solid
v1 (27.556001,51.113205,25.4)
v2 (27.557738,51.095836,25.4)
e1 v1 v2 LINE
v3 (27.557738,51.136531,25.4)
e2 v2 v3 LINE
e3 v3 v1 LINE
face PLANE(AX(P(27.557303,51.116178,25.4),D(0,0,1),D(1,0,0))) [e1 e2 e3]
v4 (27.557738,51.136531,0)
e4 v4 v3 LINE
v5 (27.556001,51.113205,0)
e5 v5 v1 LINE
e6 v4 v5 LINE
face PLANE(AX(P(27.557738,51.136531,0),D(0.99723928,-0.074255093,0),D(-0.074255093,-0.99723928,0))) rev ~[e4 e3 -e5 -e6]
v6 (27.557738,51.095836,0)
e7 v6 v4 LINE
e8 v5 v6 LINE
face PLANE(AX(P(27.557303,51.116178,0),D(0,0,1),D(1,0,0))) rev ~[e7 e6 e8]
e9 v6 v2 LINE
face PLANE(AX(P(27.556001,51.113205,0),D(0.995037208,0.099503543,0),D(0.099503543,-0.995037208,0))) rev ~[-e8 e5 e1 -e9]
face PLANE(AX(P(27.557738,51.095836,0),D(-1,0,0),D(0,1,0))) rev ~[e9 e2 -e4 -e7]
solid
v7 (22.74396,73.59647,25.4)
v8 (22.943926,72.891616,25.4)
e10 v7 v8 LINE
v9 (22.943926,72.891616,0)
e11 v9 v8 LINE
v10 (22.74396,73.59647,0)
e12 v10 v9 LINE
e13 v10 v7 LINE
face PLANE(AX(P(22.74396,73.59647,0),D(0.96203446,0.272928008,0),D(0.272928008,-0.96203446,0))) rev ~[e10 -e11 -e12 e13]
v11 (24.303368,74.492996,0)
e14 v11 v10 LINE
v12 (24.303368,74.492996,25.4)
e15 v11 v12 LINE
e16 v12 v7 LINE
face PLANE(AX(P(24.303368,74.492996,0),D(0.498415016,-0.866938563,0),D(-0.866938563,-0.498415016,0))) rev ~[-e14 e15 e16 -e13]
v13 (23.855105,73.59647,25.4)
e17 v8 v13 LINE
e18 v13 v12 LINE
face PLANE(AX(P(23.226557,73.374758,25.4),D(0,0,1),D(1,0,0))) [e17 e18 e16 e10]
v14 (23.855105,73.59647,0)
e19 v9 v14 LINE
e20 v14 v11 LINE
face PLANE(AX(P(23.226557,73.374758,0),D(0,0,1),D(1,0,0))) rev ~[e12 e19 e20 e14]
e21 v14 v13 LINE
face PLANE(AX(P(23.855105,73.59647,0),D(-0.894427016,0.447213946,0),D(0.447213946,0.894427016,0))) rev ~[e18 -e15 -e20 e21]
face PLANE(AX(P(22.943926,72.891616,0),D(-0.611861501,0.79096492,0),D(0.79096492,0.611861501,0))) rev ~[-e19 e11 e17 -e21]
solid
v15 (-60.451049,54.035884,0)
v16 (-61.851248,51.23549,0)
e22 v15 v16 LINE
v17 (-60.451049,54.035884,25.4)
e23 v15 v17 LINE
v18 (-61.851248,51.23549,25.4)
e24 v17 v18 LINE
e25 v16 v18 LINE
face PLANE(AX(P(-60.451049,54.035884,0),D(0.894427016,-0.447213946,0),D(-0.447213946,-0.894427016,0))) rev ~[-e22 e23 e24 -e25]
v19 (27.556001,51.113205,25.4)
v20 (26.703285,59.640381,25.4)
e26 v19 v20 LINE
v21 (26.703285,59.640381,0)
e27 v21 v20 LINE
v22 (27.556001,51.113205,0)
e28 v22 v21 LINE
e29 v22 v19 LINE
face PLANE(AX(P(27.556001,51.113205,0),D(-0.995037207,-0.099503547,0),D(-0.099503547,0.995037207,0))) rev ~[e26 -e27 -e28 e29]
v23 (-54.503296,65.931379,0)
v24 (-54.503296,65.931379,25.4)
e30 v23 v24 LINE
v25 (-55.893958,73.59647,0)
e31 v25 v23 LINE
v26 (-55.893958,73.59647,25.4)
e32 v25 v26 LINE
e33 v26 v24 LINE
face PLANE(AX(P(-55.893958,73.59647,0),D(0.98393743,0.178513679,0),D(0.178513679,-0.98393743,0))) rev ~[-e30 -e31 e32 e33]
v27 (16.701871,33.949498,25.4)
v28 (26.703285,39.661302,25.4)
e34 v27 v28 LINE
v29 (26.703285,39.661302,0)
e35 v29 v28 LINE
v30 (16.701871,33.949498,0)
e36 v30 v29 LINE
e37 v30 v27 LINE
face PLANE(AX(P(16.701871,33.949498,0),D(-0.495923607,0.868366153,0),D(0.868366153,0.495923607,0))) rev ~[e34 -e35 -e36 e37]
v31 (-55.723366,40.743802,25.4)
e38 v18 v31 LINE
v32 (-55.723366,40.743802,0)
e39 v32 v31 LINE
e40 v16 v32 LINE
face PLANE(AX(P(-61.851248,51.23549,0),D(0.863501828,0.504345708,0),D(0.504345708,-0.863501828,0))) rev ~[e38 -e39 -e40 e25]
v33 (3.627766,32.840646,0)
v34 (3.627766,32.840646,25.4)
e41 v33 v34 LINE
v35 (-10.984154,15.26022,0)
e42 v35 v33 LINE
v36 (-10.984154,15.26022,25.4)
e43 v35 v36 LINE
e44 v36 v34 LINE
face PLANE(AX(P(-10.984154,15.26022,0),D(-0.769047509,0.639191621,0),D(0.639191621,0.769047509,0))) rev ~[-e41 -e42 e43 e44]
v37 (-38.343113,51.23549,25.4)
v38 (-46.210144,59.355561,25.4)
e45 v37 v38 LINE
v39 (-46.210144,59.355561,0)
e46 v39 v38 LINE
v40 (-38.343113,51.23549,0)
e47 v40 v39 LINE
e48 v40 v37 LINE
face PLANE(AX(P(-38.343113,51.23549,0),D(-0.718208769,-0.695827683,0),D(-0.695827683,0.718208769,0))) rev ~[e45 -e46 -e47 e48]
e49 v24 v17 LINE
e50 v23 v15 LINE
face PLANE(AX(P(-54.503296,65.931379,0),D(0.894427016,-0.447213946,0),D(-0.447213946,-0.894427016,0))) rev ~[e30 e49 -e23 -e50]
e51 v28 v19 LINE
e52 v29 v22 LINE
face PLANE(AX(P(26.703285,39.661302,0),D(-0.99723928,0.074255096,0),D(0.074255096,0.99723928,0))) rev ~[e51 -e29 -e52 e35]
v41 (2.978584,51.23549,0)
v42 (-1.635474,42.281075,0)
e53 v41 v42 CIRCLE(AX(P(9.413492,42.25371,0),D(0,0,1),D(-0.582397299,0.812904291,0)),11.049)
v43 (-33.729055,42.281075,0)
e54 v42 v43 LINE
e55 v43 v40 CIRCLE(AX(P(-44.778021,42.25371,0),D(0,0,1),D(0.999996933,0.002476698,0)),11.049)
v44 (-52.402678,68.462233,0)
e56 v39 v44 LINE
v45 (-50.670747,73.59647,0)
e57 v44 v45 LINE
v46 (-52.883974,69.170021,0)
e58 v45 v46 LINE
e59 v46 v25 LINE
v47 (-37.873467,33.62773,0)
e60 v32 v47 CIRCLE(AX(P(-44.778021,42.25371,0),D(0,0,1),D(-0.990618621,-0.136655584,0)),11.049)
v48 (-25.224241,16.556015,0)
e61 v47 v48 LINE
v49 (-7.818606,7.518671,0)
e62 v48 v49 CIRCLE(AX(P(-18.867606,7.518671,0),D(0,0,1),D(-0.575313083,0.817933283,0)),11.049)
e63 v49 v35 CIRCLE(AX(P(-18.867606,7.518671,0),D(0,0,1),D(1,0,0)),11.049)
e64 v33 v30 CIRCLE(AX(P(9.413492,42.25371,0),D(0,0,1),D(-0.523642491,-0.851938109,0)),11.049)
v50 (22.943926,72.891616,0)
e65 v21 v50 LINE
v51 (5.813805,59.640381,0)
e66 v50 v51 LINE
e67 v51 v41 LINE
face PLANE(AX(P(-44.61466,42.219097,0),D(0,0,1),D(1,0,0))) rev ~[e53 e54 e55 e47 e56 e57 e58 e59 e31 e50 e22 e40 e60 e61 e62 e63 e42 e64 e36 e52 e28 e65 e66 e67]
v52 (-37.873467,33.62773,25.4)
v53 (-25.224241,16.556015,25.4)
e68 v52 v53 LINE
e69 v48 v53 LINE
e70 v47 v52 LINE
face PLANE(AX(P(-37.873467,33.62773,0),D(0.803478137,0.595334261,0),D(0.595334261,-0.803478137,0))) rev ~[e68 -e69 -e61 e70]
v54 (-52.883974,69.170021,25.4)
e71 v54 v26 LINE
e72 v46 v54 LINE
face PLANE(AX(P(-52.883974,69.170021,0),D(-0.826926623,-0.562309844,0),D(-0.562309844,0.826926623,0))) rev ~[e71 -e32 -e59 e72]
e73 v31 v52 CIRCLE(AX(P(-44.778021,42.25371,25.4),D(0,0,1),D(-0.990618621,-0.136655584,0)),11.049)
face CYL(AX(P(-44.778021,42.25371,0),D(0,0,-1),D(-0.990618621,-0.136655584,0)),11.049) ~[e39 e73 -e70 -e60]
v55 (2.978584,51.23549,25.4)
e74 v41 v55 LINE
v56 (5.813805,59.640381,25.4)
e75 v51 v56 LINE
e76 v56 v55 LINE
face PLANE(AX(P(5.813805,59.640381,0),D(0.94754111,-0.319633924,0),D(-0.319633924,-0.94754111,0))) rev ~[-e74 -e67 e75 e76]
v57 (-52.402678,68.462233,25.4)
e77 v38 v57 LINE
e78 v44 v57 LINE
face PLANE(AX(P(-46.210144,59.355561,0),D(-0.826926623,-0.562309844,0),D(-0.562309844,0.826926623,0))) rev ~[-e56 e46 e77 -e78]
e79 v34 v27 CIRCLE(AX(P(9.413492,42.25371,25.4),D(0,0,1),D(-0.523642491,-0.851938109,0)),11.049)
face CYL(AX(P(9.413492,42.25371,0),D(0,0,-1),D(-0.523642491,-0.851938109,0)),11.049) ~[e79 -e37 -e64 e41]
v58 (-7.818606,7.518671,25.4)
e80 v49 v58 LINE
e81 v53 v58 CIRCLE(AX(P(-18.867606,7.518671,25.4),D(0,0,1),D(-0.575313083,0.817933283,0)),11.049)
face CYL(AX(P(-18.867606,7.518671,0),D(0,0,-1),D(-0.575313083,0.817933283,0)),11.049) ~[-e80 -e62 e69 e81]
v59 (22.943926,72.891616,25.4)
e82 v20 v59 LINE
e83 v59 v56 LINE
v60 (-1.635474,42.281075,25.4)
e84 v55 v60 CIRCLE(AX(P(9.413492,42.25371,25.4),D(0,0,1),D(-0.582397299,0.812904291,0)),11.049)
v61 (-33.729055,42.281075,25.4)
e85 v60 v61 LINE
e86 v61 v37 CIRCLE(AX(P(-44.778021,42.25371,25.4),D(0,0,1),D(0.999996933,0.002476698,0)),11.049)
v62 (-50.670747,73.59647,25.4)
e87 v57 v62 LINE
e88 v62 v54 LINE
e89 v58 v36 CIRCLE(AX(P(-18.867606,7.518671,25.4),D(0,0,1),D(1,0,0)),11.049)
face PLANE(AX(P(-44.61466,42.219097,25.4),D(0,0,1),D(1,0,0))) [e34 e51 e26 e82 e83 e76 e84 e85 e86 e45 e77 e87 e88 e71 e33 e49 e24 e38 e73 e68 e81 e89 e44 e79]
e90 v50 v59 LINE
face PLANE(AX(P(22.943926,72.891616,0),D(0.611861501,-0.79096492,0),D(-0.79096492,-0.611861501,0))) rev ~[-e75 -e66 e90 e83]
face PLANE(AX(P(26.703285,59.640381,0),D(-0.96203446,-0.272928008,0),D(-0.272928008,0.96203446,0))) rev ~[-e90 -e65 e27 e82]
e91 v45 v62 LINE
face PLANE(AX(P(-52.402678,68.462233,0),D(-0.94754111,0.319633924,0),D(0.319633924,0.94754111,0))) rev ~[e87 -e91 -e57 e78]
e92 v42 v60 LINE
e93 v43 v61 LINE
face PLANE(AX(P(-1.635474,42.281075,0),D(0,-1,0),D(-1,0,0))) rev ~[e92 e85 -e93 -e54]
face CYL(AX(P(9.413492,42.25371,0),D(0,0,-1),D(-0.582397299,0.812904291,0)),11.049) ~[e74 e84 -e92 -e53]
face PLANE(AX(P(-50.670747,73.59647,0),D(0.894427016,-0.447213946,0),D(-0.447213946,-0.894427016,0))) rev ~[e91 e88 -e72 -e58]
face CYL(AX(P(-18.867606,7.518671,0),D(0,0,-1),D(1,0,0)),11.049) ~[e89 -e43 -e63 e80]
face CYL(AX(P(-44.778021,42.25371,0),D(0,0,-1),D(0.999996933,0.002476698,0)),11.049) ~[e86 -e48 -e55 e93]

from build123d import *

# Parameters (mm, degrees)
F1_DEPTH = 25.4


with BuildPart() as f1:
    # F0 (on Top) → F1 (new body)
    with BuildSketch(Plane.XY):
        with BuildLine():
            ThreePointArc((-37.8734666786, 33.6277300409), (-34.8188839288, 37.4687345669), (-33.7290209754, 42.2537100409))
            ThreePointArc((-33.7290209754, 42.2537100409), (-33.7290294473, 42.2673925671), (-33.7290548629, 42.2810750723))
            ThreePointArc((-33.7290548629, 42.2810750723), (-34.9562672594, 47.3146936352), (-38.3431132138, 51.2354895473))
            ThreePointArc((-38.3431132138, 51.2354895473), (-50.4880897696, 51.7128598635), (-55.723366114, 40.743802495))
            ThreePointArc((-55.723366114, 40.743802495), (-48.8696733861, 31.9902417407), (-37.8734666786, 33.6277300409))
        make_face()
        with BuildLine():
            ThreePointArc((-33.7290548629, 42.2810750723), (-33.7290294473, 42.2673925671), (-33.7290209754, 42.2537100409))
            ThreePointArc((-33.7290209754, 42.2537100409), (-34.8188839288, 37.4687345669), (-37.8734666786, 33.6277300409))
            Line((-37.8734666786, 33.6277300409), (-25.2242405565, 16.5560153692))
            ThreePointArc((-25.2242405565, 16.5560153692), (-17.8663248029, 18.5222079697), (-10.9841542957, 15.2602198201))
            Line((-10.9841542957, 15.2602198201), (3.627766169, 32.8406458768))
            ThreePointArc((3.627766169, 32.8406458768), (-0.2370073884, 36.8733511802), (-1.6354740563, 42.2810750723))
            Line((-1.6354740563, 42.2810750723), (-33.7290548629, 42.2810750723))
        make_face()
        with BuildLine():
            ThreePointArc((-55.723366114, 40.743802495), (-50.4880897696, 51.7128598635), (-38.3431132138, 51.2354895473))
            Line((-38.3431132138, 51.2354895473), (-46.2101437151, 59.3555606902))
            Line((-46.2101437151, 59.3555606902), (-52.4026783197, 68.4622334303))
            Line((-52.4026783197, 68.4622334303), (-54.0672166674, 63.5277806198))
            Line((-54.0672166674, 63.5277806198), (-54.503296363, 65.9313786952))
            Line((-54.503296363, 65.9313786952), (-60.4510493577, 54.0358843751))
            Line((-60.4510493577, 54.0358843751), (-61.8512481451, 51.2354895473))
            Line((-61.8512481451, 51.2354895473), (-55.723366114, 40.743802495))
        make_face()
        with BuildLine():
            ThreePointArc((2.9785842946, 51.2354895473), (-0.4082616598, 47.3146936352), (-1.6354740563, 42.2810750723))
            ThreePointArc((-1.6354740563, 42.2810750723), (-0.2370073884, 36.8733511802), (3.627766169, 32.8406458768))
            ThreePointArc((3.627766169, 32.8406458768), (10.3472373536, 31.2442359064), (16.7018712654, 33.9494984888))
            ThreePointArc((16.7018712654, 33.9494984888), (19.4785231759, 37.6956896857), (20.4624920562, 42.2537100409))
            ThreePointArc((20.4624920562, 42.2537100409), (14.4623090039, 52.0817234938), (2.9785842946, 51.2354895473))
        make_face()
        with BuildLine():
            ThreePointArc((-10.9841542957, 15.2602198201), (-17.8663248029, 18.5222079697), (-25.2242405565, 16.5560153692))
            ThreePointArc((-25.2242405565, 16.5560153692), (-23.9590672402, -2.2873187943), (-7.8186062971, 7.5186705217))
            ThreePointArc((-7.8186062971, 7.5186705217), (-8.6405670833, 11.7005444937), (-10.9841542957, 15.2602198201))
        make_face()
        with BuildLine():
            Line((5.8138054379, 59.6403814852), (2.9785842946, 51.2354895473))
            ThreePointArc((2.9785842946, 51.2354895473), (14.4623090039, 52.0817234938), (20.4624920562, 42.2537100409))
            ThreePointArc((20.4624920562, 42.2537100409), (19.4785231759, 37.6956896857), (16.7018712654, 33.9494984888))
            Line((16.7018712654, 33.9494984888), (26.7032850534, 39.661302415))
            Line((26.7032850534, 39.661302415), (27.5560012574, 51.1132045745))
            Line((27.5560012574, 51.1132045745), (26.7032850534, 59.6403814852))
            Line((26.7032850534, 59.6403814852), (22.9439260349, 72.8916155568))
            Line((22.9439260349, 72.8916155568), (5.8138054379, 59.6403814852))
        make_face()
        Polygon((-54.0672166674, 63.5277806198), (-52.4026783197, 68.4622334303), (-52.8839736318, 69.1700209806), (-54.503296363, 65.9313786952), align=None)
        Polygon((-52.8839736318, 69.1700209806), (-52.4026783197, 68.4622334303), (-50.6707469221, 73.596470058), align=None)
        Polygon((-54.503296363, 65.9313786952), (-52.8839736318, 69.1700209806), (-55.8939576149, 73.596470058), align=None)
    extrude(amount=F1_DEPTH)


with BuildPart() as f1b:
    # F0 (on Top) → F1, piece 2 (new body)
    with BuildSketch(Plane.XY):
        Polygon((22.7439596686, 73.596470058), (22.9439260349, 72.8916155568), (23.8551047631, 73.596470058), align=None)
        Polygon((22.7439596686, 73.596470058), (23.8551047631, 73.596470058), (24.3033679332, 74.4929955189), align=None)
    extrude(amount=F1_DEPTH)


with BuildPart() as f1c:
    # F0 (on Top) → F1, piece 3 (new body)
    with BuildSketch(Plane.XY):
        Polygon((27.5577381253, 51.1365305556), (27.5560012574, 51.1132045745), (27.5577381253, 51.0958358645), align=None)
    extrude(amount=F1_DEPTH)


solid = Compound([f1.part, f1b.part, f1c.part])
